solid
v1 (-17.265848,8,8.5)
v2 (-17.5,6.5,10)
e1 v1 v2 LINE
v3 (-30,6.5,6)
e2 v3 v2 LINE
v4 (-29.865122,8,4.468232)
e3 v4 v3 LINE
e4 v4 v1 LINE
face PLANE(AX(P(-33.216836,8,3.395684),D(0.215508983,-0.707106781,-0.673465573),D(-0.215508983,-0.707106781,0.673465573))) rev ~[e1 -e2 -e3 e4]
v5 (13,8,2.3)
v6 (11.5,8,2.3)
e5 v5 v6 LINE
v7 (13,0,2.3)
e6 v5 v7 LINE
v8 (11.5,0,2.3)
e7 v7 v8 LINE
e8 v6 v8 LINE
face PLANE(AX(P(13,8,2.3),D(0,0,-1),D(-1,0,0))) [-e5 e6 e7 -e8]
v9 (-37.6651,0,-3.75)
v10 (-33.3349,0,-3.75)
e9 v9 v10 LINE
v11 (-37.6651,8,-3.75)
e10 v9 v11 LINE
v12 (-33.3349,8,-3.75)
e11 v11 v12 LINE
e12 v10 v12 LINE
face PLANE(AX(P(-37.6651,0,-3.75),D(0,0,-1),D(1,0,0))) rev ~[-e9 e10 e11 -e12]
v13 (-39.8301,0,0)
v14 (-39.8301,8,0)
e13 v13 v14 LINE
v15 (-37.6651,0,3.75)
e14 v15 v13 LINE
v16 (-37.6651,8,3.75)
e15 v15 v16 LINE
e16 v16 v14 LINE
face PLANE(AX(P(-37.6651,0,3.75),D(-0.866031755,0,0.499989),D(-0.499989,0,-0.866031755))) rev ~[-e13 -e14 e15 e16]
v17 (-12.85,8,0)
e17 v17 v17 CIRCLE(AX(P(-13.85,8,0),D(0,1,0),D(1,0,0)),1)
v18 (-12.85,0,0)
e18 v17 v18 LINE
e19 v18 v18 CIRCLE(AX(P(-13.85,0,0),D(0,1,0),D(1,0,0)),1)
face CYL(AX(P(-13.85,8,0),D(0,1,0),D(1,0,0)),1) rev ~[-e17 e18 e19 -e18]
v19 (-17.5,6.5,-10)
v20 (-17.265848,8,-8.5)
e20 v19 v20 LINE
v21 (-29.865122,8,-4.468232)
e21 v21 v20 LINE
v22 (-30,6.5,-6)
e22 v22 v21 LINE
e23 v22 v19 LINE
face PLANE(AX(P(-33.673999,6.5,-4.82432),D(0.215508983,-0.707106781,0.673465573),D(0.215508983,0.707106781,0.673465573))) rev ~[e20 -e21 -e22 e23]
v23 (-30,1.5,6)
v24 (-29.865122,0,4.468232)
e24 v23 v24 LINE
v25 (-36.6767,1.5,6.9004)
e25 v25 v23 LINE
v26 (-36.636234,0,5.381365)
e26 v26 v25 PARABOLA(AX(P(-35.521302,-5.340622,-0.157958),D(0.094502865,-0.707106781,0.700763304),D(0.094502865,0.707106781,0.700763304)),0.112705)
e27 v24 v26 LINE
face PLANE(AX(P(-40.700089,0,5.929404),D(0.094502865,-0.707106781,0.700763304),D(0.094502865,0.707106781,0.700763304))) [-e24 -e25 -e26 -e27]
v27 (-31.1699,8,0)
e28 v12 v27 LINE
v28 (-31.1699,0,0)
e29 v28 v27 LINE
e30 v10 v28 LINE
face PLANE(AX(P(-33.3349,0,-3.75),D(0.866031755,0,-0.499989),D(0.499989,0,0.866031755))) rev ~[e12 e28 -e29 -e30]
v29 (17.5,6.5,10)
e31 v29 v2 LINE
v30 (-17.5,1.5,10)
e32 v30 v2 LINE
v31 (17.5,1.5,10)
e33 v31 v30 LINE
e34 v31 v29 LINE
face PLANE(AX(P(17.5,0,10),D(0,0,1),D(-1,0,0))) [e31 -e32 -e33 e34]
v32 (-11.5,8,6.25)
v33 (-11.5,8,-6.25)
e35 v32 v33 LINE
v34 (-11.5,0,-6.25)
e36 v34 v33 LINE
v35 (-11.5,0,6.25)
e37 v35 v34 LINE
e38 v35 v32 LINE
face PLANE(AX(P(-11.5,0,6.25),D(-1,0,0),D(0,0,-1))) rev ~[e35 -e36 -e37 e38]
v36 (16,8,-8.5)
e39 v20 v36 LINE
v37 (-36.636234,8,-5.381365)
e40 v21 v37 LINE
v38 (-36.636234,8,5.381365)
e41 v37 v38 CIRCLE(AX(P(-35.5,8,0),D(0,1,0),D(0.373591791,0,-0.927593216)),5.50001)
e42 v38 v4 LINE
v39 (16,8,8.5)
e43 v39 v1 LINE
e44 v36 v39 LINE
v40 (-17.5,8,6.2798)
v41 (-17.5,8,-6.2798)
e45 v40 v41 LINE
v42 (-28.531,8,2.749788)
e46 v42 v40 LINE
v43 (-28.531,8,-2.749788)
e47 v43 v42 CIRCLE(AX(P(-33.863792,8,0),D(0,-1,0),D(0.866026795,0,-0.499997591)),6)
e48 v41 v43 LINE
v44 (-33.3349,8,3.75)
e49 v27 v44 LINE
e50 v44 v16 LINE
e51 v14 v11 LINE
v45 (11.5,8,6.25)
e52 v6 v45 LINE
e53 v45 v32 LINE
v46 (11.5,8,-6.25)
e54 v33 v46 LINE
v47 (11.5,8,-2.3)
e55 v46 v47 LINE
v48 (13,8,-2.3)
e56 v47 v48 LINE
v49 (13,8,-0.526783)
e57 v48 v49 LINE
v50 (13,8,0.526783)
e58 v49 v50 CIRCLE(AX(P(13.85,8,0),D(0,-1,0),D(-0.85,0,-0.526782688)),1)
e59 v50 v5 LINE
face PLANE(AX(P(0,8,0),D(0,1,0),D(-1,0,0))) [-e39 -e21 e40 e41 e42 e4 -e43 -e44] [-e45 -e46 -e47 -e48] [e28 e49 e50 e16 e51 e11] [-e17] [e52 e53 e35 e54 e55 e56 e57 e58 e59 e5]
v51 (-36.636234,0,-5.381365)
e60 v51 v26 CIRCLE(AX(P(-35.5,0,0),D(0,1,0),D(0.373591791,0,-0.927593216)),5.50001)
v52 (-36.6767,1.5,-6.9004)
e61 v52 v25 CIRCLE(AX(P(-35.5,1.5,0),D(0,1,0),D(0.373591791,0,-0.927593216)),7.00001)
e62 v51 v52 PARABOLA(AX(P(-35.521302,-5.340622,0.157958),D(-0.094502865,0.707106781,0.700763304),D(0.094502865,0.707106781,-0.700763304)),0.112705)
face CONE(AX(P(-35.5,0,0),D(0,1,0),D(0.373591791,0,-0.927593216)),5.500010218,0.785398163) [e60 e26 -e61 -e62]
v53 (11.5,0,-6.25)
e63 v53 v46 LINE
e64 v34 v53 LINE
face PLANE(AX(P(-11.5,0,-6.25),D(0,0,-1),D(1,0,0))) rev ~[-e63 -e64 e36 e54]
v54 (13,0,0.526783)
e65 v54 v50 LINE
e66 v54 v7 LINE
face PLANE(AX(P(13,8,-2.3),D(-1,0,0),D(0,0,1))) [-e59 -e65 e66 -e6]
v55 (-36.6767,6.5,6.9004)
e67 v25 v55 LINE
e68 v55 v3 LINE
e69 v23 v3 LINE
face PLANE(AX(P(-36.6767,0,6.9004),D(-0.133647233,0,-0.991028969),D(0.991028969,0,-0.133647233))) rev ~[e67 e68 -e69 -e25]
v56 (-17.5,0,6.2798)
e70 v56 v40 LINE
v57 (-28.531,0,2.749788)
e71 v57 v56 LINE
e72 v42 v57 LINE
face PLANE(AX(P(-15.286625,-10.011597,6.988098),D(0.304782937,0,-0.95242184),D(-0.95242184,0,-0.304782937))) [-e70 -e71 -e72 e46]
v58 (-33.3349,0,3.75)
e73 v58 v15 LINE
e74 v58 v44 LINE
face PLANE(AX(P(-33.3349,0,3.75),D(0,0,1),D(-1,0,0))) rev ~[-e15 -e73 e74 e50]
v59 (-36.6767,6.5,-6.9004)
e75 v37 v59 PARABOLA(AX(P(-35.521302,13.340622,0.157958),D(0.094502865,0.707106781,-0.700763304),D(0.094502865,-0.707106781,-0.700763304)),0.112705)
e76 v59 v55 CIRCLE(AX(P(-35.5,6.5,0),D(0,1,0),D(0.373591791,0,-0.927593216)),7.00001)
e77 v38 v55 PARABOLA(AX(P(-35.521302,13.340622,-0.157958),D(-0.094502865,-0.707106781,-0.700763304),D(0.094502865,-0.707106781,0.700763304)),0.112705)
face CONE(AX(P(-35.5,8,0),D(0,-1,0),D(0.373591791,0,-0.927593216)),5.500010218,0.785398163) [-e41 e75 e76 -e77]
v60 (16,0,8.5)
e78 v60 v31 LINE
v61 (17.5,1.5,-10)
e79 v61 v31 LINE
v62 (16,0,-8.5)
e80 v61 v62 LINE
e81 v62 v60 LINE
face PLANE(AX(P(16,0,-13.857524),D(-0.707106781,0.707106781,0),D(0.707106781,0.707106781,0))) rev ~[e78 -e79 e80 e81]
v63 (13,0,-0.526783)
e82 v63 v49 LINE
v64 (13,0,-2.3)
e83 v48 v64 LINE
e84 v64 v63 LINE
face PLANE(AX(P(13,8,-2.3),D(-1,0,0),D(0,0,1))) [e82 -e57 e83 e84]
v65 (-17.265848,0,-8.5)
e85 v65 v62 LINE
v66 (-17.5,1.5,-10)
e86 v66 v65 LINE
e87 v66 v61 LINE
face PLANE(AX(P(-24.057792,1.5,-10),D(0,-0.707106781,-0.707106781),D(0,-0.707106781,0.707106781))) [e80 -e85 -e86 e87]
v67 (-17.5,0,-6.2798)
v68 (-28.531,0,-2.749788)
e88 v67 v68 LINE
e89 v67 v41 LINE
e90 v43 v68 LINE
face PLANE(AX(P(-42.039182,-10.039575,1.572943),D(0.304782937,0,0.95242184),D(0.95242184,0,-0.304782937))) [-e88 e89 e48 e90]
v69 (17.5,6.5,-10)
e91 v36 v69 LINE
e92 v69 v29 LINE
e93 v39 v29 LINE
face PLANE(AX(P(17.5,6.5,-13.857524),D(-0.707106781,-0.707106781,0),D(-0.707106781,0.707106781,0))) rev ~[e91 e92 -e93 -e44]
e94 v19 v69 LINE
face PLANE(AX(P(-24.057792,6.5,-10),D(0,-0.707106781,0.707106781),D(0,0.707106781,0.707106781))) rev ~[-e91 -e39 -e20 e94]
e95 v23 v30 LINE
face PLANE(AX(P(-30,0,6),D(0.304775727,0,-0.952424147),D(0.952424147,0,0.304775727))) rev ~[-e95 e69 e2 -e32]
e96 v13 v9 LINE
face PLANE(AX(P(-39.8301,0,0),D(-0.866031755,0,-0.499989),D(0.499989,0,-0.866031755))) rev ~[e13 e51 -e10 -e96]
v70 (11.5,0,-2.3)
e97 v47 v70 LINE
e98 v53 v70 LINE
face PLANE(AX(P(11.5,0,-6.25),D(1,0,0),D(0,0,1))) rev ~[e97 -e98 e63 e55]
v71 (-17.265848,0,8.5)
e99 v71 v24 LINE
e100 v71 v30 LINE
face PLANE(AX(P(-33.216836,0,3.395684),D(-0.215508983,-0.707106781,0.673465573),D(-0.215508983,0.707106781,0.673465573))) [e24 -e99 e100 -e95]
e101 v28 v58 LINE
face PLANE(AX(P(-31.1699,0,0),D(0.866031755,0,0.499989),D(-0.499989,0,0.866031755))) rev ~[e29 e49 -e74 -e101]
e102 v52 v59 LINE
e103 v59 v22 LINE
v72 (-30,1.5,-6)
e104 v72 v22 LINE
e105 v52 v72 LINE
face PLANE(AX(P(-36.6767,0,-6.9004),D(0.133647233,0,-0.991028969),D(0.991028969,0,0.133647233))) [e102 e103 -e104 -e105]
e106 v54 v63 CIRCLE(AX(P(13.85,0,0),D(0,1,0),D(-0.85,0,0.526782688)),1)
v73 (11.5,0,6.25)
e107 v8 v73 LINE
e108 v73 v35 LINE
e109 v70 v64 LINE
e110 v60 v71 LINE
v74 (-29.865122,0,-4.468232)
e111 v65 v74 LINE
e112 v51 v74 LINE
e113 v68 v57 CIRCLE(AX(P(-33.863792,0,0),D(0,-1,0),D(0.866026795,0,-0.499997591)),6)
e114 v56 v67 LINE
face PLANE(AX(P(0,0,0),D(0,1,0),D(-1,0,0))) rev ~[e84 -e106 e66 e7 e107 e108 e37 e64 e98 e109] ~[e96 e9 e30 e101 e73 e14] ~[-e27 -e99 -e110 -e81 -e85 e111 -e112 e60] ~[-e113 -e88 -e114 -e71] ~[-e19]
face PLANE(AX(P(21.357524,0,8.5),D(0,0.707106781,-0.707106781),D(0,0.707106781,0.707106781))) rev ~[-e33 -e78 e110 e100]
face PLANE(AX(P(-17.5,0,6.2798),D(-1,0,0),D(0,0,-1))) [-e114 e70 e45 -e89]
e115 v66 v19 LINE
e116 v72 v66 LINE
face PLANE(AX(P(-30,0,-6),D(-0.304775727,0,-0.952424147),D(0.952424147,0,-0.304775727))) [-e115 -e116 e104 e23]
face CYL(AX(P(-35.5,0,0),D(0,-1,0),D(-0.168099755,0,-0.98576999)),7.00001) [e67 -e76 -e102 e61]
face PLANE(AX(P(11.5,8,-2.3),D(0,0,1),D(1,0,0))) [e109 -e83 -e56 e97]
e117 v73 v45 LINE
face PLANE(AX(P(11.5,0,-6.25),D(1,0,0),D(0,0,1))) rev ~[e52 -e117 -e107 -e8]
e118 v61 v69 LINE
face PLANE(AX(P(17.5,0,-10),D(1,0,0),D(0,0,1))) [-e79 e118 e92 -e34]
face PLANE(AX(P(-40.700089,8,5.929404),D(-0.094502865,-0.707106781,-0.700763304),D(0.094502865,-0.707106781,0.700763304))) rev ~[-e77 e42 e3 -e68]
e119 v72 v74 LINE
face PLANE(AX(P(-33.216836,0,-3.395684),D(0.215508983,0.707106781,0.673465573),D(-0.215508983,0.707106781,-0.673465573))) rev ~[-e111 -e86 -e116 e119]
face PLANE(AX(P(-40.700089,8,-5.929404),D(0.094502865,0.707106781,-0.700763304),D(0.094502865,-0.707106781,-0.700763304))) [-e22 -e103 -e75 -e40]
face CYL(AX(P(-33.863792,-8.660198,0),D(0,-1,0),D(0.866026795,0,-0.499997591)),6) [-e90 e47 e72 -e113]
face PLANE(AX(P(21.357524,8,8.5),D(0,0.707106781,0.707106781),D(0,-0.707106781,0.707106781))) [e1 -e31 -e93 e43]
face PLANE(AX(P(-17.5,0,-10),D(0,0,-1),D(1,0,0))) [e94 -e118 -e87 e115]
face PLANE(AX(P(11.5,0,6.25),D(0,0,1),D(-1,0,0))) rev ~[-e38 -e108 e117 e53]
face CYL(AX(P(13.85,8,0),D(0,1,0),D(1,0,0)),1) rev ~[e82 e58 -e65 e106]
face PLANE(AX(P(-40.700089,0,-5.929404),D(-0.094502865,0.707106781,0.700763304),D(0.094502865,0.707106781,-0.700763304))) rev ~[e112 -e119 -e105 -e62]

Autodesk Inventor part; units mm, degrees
ref_plane "YZ Plane" through (0, 0, 0) normal (1, 0, 0) x (0, 1, 0)
ref_plane "XZ Plane" through (0, 0, 0) normal (0, 1, 0) x (-1, 0, 0)
ref_plane "XY Plane" through (0, 0, 0) normal (0, 0, 1) x (1, 0, 0)
sketch "Boceto1" plane through (0, 0, 0) normal (0, 1, 0) x (-1, 0, 0)
  line L0 (17.5, -10) -> (-17.5, -10)
  line L1 (-17.5, -10) -> (-17.5, 10)
  line L2 (-17.5, 10) -> (17.5, 10)
  line L3 (17.5, 10) -> (17.5, 6.2798) construction
  line L4 (17.5, -10) -> (-17.5, 10) construction
  line L5 (-17.5, -10) -> (17.5, 10) construction
  line L6 (11.5, -6.25) -> (-11.5, -6.25)
  line L7 (-11.5, -6.25) -> (-11.5, 6.25)
  line L8 (-11.5, 6.25) -> (11.5, 6.25)
  line L9 (11.5, 6.25) -> (11.5, -6.25)
  line L10 (11.5, -6.25) -> (-11.5, 6.25) construction
  line L11 (-11.5, -6.25) -> (11.5, 6.25) construction
  arc A0 (36.6767, -6.9004) -> (36.6767, 6.9004) centre (35.5, 0) ccw
  line L12 (42.5, -10) -> (42.5, 4.9137) construction
  line L13 (37.6651, 3.75) -> (39.8301, 0)
  line L14 (39.8301, 0) -> (37.6651, -3.75)
  line L15 (37.6651, -3.75) -> (33.3349, -3.75)
  line L16 (33.3349, -3.75) -> (31.1699, 0)
  line L17 (31.1699, 0) -> (33.3349, 3.75)
  line L18 (33.3349, 3.75) -> (37.6651, 3.75)
  line L19 (28.5244, -2.7519) -> (26.9356, 0)
  line L20 (26.9356, 0) -> (28.5244, 2.7519)
  line L21 (17.5, -6.2798) -> (17.5, -10) construction
  line L22 (17.5, 6.2798) -> (17.5, -6.2798)
  line L23 (36.6767, -6.9004) -> (30, -6)
  line L24 (30, -6) -> (17.5, -10)
  line L25 (36.6767, 6.9004) -> (30, 6)
  line L26 (30, 6) -> (17.5, 10)
  line L27 (17.5, 6.2798) -> (28.5244, 2.7519)
  line L28 (17.5, -6.2798) -> (28.5244, -2.7519)
  point P0 (0, 0)
  point P1 (0, 0)
  point P2 (0, 0)
  point P3 (0, 0)
  point P4 (0, 0)
  point P5 (17.5, 10)
  dimension "d1" = 35
  dimension "d2" = 23
  dimension "d3" = 12.5
  dimension "d4" = 20
  dimension "d6" = 14
  dimension "d7" = 60
  dimension "d8" = 7.5
  dimension "d9" = 0
  dimension "d10" = 3.667
  dimension "d11" = 0
  dimension "d15" = 6
  dimension "d16" = 6
  dimension "d17" = 30
  dimension "d18" = 30
extrude "Extrusión1" add sketch "Boceto1" along normal blind 8
sketch "Boceto2" plane through (0, 8, 0) normal (0, 1, 0) x (1, 0, 0)
  circle A0 centre (-13.85, 0) radius 1
  circle A1 centre (13.85, 0) radius 1
  line L0 (0, 0) -> (0, -2.5102) construction
  dimension "d19" = 2
  dimension "d20" = 2
  dimension "d21" = 27.7
extrude "Extrusión2" cut sketch "Boceto2" against normal through all
sketch "Boceto3" plane through (0, 8, 0) normal (0, 1, 0) x (1, 0, 0)
  line L0 (11.5, 6.25) -> (11.5, -6.25) projected
  line L1 (11.5, 6.25) -> (11.5, -6.25) projected
  line L2 (11.5, 2.3) -> (13, 2.3)
  line L3 (13, 2.3) -> (13, -2.3)
  line L4 (13, -2.3) -> (11.5, -2.3)
  line L5 (11.5, -2.3) -> (11.5, 2.3)
  line L6 (0, 0) -> (1.0594, 0) construction
  point P0 (11.5, 2.3)
  point P1 (11.5, -2.3)
  dimension "d24" = 4.6
  dimension "d34" = 1.5
extrude "Extrusión3" cut sketch "Boceto3" against normal through all
chamfer "Chaflán1" distance 1.5 angle 45 8 edges at (0, 8, -10) (-23.75, 8, -8) (-33.3383, 8, -6.4502) (-42.5, 8, 0) (-33.3383, 8, 6.4502) (-23.75, 8, 8) (0, 8, 10) (17.5, 8, 0)
fillet "Empalme1" radius 6 1 edges at (-26.9356, 4, 0)
chamfer "Chaflán2" distance 1.5 angle 45 8 edges at (0, 0, 10) (17.5, 0, 0) (0, 0, -10) (-23.75, 0, -8) (-33.3383, 0, -6.4502) (-42.5, 0, 0) (-33.3383, 0, 6.4502) (-23.75, 0, 8)
properties part number "Tibia_V2"
